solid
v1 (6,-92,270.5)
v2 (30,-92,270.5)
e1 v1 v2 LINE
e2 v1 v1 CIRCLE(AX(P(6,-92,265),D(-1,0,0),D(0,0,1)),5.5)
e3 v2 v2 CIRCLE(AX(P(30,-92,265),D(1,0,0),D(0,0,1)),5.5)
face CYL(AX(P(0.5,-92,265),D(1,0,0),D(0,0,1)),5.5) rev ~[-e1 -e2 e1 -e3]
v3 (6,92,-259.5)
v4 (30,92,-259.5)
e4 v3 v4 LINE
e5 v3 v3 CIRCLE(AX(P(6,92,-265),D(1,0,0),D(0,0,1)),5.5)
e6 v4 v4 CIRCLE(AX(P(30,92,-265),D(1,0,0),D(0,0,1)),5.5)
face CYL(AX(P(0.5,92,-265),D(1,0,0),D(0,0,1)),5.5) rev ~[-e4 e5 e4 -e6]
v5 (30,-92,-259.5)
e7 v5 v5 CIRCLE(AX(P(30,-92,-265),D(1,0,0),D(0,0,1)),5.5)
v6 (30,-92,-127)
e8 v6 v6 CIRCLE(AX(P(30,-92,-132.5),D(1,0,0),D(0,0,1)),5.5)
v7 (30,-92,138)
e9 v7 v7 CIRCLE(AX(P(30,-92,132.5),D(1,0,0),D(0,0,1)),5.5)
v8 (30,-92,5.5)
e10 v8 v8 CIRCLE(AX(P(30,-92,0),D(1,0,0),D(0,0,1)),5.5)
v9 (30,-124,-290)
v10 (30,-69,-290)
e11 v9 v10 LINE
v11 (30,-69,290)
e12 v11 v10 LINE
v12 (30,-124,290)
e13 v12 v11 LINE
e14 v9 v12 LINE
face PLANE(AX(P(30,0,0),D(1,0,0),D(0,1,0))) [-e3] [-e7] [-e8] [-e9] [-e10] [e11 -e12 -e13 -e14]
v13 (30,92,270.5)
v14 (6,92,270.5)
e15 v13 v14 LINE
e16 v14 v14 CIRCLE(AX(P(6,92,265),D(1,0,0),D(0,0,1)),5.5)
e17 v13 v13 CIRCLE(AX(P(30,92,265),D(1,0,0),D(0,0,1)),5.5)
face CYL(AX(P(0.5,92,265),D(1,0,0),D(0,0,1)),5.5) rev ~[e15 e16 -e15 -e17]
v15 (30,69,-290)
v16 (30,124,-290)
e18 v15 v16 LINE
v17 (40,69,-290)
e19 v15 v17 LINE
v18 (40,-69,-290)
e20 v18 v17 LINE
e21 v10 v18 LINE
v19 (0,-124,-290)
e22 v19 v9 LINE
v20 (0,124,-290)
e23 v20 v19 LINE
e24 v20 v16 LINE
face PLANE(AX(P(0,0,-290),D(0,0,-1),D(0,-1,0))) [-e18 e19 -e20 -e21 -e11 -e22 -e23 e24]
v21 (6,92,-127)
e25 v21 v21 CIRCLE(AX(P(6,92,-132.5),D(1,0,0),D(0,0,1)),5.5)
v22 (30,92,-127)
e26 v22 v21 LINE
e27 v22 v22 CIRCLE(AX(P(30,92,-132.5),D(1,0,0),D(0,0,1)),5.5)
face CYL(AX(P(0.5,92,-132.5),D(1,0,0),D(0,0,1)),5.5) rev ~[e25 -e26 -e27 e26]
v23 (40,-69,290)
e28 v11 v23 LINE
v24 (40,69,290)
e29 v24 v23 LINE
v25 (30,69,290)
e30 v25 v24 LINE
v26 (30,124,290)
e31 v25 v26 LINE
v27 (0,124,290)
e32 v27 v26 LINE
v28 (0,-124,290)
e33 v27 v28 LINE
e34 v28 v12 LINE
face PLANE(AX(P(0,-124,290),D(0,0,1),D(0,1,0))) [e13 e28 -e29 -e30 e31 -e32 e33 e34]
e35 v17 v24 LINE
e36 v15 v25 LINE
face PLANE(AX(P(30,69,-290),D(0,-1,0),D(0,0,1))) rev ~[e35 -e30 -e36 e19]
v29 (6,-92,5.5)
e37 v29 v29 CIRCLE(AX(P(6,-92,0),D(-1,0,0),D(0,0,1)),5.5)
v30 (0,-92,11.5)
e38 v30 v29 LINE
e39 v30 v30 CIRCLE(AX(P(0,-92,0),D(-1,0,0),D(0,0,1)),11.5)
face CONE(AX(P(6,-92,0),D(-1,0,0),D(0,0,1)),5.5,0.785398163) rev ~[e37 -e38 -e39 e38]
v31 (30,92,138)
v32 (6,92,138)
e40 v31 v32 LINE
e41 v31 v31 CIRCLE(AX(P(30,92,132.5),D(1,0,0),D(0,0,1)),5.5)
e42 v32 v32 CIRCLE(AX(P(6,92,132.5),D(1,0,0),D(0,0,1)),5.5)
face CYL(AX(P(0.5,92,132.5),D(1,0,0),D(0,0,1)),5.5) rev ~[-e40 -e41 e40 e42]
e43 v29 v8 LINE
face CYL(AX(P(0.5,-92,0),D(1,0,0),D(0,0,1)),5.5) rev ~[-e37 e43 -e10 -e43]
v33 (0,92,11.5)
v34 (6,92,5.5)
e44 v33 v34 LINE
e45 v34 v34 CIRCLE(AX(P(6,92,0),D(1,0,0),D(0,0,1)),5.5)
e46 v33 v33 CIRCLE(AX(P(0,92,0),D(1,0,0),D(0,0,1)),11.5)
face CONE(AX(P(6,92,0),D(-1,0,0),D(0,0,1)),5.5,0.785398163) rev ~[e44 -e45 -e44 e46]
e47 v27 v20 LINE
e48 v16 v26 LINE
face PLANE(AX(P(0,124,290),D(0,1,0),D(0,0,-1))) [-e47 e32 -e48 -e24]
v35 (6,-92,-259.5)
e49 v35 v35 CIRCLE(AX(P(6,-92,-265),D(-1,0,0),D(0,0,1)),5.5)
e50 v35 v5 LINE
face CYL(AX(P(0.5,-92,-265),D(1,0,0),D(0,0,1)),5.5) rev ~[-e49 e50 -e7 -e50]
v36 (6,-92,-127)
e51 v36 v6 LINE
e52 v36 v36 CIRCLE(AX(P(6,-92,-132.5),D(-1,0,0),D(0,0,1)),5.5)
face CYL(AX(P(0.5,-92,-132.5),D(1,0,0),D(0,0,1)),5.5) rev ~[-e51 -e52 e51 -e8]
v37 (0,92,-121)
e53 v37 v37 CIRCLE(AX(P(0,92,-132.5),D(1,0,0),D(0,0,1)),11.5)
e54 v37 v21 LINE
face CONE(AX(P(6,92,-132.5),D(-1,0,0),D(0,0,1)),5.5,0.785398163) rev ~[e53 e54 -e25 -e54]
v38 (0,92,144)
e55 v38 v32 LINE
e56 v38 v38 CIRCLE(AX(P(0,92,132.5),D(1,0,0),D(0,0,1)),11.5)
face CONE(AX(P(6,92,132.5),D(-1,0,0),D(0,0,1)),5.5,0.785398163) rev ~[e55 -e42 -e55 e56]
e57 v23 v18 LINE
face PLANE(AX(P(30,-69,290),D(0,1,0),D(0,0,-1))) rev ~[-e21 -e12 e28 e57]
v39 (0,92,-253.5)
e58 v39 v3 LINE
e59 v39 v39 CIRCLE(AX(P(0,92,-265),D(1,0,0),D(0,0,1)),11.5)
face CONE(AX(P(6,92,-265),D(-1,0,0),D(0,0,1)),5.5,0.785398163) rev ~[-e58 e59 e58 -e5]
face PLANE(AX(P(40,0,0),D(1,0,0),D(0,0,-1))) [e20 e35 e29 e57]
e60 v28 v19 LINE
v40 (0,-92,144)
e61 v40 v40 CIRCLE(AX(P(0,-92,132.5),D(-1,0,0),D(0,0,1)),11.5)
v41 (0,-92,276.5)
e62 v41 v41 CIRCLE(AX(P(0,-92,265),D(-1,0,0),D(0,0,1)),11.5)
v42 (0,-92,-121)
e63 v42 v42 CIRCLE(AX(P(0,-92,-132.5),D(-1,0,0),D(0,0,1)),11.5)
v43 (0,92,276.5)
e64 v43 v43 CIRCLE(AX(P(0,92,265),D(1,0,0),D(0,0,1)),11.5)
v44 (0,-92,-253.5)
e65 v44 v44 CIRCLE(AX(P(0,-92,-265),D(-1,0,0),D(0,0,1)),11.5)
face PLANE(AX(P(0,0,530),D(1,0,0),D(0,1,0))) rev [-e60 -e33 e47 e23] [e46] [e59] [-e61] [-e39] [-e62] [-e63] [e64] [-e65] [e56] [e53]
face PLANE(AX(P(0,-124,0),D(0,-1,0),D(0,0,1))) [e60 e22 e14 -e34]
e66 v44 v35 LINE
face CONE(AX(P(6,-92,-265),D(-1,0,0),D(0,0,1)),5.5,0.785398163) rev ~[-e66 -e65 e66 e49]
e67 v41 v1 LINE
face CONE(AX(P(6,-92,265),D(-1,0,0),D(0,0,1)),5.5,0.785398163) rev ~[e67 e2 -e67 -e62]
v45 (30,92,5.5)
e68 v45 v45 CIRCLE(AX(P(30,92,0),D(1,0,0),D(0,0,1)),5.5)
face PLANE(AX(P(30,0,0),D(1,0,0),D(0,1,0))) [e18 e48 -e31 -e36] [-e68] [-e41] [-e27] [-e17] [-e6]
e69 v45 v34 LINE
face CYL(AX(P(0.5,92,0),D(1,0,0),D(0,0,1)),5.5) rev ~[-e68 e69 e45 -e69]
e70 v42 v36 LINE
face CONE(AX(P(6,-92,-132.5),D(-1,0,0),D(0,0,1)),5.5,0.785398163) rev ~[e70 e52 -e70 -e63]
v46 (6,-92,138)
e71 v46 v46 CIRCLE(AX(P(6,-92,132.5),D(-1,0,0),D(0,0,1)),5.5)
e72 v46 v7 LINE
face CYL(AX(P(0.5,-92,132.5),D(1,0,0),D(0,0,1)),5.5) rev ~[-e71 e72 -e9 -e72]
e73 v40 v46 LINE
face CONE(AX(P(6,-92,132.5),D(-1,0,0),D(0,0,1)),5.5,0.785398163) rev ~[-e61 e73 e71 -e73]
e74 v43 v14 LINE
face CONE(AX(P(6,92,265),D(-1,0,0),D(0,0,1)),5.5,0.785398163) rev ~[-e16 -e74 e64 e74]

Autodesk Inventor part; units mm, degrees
ref_plane "YZ Plane" through (0, 0, 0) normal (1, 0, 0) x (0, 1, 0)
ref_plane "XZ Plane" through (0, 0, 0) normal (0, 1, 0) x (-1, 0, 0)
sketch "草圖1" plane through (0, 0, 0) normal (1, 0, 0) x (0, 1, 0)
  line L0 (-173.6, 0) -> (173.6, 0) projected
  line L1 (0, -406) -> (0, 406) projected
  line L2 (-124, 290) -> (124, 290)
  line L3 (124, 290) -> (124, -290)
  line L4 (124, -290) -> (-124, -290)
  line L5 (-124, -290) -> (-124, 290)
  line L6 (-124, 290) -> (124, -290) construction
  line L7 (124, 290) -> (-124, -290) construction
  point P0 (0, 0)
  dimension "d0" = 248
  dimension "d1" = 580
extrude "擠出1" add sketch "草圖1" along normal blind 30
sketch "草圖2" plane through (30, 0, 0) normal (1, 0, 0) x (0, 0, -1)
  line L0 (-290, -69) -> (290, -69)
  line L1 (290, -69) -> (290, 69)
  line L2 (290, 69) -> (-290, 69)
  line L3 (-290, 69) -> (-290, -69)
  line L4 (-290, -69) -> (290, 69) construction
  line L5 (290, -69) -> (-290, 69) construction
  point P0 (0, 0)
  dimension "d4" = 580
  dimension "d5" = 138
extrude "擠出2" add sketch "草圖2" along normal blind 10
sketch "草圖3" plane through (0, 0, 0) normal (-1, 0, 0) x (0, 0, 1)
  line L0 (0, -173.6) -> (0, 173.6) projected
  line L1 (-406, 0) -> (406, 0) projected
  line L2 (-290, 124) -> (-290, -124) projected
  point P0 (0, 0)
  point P1 (-265, 92)
  dimension "d8" = 92
  dimension "d9" = 25
hole "孔1" at (0, 92, -265) direction (1, 0, 0) diameter 11 end through all countersink diameter 12 countersink angle 90
delete faces "刪除面1" heal yes whole lump no faces at (0.1667, 86.1714, -265.2349)
chamfer "倒角1" distance 6 angle 45 1 edges at (0, 92, -270.5)
pattern_linear "矩形陣列1" count 5 spacing 132.5 along (0, 0, 1) of "孔1", "刪除面1", "倒角1"
ref_plane "工作平面1" through (30, 0, -290) normal (0, -1, 0) x (1, 0, 0)
mirror "鏡射1" about plane through (30, 0, -290) normal (0, -1, 0) of "孔1", "刪除面1", "倒角1", "矩形陣列1"
properties part number "exercise3-14ipt"
